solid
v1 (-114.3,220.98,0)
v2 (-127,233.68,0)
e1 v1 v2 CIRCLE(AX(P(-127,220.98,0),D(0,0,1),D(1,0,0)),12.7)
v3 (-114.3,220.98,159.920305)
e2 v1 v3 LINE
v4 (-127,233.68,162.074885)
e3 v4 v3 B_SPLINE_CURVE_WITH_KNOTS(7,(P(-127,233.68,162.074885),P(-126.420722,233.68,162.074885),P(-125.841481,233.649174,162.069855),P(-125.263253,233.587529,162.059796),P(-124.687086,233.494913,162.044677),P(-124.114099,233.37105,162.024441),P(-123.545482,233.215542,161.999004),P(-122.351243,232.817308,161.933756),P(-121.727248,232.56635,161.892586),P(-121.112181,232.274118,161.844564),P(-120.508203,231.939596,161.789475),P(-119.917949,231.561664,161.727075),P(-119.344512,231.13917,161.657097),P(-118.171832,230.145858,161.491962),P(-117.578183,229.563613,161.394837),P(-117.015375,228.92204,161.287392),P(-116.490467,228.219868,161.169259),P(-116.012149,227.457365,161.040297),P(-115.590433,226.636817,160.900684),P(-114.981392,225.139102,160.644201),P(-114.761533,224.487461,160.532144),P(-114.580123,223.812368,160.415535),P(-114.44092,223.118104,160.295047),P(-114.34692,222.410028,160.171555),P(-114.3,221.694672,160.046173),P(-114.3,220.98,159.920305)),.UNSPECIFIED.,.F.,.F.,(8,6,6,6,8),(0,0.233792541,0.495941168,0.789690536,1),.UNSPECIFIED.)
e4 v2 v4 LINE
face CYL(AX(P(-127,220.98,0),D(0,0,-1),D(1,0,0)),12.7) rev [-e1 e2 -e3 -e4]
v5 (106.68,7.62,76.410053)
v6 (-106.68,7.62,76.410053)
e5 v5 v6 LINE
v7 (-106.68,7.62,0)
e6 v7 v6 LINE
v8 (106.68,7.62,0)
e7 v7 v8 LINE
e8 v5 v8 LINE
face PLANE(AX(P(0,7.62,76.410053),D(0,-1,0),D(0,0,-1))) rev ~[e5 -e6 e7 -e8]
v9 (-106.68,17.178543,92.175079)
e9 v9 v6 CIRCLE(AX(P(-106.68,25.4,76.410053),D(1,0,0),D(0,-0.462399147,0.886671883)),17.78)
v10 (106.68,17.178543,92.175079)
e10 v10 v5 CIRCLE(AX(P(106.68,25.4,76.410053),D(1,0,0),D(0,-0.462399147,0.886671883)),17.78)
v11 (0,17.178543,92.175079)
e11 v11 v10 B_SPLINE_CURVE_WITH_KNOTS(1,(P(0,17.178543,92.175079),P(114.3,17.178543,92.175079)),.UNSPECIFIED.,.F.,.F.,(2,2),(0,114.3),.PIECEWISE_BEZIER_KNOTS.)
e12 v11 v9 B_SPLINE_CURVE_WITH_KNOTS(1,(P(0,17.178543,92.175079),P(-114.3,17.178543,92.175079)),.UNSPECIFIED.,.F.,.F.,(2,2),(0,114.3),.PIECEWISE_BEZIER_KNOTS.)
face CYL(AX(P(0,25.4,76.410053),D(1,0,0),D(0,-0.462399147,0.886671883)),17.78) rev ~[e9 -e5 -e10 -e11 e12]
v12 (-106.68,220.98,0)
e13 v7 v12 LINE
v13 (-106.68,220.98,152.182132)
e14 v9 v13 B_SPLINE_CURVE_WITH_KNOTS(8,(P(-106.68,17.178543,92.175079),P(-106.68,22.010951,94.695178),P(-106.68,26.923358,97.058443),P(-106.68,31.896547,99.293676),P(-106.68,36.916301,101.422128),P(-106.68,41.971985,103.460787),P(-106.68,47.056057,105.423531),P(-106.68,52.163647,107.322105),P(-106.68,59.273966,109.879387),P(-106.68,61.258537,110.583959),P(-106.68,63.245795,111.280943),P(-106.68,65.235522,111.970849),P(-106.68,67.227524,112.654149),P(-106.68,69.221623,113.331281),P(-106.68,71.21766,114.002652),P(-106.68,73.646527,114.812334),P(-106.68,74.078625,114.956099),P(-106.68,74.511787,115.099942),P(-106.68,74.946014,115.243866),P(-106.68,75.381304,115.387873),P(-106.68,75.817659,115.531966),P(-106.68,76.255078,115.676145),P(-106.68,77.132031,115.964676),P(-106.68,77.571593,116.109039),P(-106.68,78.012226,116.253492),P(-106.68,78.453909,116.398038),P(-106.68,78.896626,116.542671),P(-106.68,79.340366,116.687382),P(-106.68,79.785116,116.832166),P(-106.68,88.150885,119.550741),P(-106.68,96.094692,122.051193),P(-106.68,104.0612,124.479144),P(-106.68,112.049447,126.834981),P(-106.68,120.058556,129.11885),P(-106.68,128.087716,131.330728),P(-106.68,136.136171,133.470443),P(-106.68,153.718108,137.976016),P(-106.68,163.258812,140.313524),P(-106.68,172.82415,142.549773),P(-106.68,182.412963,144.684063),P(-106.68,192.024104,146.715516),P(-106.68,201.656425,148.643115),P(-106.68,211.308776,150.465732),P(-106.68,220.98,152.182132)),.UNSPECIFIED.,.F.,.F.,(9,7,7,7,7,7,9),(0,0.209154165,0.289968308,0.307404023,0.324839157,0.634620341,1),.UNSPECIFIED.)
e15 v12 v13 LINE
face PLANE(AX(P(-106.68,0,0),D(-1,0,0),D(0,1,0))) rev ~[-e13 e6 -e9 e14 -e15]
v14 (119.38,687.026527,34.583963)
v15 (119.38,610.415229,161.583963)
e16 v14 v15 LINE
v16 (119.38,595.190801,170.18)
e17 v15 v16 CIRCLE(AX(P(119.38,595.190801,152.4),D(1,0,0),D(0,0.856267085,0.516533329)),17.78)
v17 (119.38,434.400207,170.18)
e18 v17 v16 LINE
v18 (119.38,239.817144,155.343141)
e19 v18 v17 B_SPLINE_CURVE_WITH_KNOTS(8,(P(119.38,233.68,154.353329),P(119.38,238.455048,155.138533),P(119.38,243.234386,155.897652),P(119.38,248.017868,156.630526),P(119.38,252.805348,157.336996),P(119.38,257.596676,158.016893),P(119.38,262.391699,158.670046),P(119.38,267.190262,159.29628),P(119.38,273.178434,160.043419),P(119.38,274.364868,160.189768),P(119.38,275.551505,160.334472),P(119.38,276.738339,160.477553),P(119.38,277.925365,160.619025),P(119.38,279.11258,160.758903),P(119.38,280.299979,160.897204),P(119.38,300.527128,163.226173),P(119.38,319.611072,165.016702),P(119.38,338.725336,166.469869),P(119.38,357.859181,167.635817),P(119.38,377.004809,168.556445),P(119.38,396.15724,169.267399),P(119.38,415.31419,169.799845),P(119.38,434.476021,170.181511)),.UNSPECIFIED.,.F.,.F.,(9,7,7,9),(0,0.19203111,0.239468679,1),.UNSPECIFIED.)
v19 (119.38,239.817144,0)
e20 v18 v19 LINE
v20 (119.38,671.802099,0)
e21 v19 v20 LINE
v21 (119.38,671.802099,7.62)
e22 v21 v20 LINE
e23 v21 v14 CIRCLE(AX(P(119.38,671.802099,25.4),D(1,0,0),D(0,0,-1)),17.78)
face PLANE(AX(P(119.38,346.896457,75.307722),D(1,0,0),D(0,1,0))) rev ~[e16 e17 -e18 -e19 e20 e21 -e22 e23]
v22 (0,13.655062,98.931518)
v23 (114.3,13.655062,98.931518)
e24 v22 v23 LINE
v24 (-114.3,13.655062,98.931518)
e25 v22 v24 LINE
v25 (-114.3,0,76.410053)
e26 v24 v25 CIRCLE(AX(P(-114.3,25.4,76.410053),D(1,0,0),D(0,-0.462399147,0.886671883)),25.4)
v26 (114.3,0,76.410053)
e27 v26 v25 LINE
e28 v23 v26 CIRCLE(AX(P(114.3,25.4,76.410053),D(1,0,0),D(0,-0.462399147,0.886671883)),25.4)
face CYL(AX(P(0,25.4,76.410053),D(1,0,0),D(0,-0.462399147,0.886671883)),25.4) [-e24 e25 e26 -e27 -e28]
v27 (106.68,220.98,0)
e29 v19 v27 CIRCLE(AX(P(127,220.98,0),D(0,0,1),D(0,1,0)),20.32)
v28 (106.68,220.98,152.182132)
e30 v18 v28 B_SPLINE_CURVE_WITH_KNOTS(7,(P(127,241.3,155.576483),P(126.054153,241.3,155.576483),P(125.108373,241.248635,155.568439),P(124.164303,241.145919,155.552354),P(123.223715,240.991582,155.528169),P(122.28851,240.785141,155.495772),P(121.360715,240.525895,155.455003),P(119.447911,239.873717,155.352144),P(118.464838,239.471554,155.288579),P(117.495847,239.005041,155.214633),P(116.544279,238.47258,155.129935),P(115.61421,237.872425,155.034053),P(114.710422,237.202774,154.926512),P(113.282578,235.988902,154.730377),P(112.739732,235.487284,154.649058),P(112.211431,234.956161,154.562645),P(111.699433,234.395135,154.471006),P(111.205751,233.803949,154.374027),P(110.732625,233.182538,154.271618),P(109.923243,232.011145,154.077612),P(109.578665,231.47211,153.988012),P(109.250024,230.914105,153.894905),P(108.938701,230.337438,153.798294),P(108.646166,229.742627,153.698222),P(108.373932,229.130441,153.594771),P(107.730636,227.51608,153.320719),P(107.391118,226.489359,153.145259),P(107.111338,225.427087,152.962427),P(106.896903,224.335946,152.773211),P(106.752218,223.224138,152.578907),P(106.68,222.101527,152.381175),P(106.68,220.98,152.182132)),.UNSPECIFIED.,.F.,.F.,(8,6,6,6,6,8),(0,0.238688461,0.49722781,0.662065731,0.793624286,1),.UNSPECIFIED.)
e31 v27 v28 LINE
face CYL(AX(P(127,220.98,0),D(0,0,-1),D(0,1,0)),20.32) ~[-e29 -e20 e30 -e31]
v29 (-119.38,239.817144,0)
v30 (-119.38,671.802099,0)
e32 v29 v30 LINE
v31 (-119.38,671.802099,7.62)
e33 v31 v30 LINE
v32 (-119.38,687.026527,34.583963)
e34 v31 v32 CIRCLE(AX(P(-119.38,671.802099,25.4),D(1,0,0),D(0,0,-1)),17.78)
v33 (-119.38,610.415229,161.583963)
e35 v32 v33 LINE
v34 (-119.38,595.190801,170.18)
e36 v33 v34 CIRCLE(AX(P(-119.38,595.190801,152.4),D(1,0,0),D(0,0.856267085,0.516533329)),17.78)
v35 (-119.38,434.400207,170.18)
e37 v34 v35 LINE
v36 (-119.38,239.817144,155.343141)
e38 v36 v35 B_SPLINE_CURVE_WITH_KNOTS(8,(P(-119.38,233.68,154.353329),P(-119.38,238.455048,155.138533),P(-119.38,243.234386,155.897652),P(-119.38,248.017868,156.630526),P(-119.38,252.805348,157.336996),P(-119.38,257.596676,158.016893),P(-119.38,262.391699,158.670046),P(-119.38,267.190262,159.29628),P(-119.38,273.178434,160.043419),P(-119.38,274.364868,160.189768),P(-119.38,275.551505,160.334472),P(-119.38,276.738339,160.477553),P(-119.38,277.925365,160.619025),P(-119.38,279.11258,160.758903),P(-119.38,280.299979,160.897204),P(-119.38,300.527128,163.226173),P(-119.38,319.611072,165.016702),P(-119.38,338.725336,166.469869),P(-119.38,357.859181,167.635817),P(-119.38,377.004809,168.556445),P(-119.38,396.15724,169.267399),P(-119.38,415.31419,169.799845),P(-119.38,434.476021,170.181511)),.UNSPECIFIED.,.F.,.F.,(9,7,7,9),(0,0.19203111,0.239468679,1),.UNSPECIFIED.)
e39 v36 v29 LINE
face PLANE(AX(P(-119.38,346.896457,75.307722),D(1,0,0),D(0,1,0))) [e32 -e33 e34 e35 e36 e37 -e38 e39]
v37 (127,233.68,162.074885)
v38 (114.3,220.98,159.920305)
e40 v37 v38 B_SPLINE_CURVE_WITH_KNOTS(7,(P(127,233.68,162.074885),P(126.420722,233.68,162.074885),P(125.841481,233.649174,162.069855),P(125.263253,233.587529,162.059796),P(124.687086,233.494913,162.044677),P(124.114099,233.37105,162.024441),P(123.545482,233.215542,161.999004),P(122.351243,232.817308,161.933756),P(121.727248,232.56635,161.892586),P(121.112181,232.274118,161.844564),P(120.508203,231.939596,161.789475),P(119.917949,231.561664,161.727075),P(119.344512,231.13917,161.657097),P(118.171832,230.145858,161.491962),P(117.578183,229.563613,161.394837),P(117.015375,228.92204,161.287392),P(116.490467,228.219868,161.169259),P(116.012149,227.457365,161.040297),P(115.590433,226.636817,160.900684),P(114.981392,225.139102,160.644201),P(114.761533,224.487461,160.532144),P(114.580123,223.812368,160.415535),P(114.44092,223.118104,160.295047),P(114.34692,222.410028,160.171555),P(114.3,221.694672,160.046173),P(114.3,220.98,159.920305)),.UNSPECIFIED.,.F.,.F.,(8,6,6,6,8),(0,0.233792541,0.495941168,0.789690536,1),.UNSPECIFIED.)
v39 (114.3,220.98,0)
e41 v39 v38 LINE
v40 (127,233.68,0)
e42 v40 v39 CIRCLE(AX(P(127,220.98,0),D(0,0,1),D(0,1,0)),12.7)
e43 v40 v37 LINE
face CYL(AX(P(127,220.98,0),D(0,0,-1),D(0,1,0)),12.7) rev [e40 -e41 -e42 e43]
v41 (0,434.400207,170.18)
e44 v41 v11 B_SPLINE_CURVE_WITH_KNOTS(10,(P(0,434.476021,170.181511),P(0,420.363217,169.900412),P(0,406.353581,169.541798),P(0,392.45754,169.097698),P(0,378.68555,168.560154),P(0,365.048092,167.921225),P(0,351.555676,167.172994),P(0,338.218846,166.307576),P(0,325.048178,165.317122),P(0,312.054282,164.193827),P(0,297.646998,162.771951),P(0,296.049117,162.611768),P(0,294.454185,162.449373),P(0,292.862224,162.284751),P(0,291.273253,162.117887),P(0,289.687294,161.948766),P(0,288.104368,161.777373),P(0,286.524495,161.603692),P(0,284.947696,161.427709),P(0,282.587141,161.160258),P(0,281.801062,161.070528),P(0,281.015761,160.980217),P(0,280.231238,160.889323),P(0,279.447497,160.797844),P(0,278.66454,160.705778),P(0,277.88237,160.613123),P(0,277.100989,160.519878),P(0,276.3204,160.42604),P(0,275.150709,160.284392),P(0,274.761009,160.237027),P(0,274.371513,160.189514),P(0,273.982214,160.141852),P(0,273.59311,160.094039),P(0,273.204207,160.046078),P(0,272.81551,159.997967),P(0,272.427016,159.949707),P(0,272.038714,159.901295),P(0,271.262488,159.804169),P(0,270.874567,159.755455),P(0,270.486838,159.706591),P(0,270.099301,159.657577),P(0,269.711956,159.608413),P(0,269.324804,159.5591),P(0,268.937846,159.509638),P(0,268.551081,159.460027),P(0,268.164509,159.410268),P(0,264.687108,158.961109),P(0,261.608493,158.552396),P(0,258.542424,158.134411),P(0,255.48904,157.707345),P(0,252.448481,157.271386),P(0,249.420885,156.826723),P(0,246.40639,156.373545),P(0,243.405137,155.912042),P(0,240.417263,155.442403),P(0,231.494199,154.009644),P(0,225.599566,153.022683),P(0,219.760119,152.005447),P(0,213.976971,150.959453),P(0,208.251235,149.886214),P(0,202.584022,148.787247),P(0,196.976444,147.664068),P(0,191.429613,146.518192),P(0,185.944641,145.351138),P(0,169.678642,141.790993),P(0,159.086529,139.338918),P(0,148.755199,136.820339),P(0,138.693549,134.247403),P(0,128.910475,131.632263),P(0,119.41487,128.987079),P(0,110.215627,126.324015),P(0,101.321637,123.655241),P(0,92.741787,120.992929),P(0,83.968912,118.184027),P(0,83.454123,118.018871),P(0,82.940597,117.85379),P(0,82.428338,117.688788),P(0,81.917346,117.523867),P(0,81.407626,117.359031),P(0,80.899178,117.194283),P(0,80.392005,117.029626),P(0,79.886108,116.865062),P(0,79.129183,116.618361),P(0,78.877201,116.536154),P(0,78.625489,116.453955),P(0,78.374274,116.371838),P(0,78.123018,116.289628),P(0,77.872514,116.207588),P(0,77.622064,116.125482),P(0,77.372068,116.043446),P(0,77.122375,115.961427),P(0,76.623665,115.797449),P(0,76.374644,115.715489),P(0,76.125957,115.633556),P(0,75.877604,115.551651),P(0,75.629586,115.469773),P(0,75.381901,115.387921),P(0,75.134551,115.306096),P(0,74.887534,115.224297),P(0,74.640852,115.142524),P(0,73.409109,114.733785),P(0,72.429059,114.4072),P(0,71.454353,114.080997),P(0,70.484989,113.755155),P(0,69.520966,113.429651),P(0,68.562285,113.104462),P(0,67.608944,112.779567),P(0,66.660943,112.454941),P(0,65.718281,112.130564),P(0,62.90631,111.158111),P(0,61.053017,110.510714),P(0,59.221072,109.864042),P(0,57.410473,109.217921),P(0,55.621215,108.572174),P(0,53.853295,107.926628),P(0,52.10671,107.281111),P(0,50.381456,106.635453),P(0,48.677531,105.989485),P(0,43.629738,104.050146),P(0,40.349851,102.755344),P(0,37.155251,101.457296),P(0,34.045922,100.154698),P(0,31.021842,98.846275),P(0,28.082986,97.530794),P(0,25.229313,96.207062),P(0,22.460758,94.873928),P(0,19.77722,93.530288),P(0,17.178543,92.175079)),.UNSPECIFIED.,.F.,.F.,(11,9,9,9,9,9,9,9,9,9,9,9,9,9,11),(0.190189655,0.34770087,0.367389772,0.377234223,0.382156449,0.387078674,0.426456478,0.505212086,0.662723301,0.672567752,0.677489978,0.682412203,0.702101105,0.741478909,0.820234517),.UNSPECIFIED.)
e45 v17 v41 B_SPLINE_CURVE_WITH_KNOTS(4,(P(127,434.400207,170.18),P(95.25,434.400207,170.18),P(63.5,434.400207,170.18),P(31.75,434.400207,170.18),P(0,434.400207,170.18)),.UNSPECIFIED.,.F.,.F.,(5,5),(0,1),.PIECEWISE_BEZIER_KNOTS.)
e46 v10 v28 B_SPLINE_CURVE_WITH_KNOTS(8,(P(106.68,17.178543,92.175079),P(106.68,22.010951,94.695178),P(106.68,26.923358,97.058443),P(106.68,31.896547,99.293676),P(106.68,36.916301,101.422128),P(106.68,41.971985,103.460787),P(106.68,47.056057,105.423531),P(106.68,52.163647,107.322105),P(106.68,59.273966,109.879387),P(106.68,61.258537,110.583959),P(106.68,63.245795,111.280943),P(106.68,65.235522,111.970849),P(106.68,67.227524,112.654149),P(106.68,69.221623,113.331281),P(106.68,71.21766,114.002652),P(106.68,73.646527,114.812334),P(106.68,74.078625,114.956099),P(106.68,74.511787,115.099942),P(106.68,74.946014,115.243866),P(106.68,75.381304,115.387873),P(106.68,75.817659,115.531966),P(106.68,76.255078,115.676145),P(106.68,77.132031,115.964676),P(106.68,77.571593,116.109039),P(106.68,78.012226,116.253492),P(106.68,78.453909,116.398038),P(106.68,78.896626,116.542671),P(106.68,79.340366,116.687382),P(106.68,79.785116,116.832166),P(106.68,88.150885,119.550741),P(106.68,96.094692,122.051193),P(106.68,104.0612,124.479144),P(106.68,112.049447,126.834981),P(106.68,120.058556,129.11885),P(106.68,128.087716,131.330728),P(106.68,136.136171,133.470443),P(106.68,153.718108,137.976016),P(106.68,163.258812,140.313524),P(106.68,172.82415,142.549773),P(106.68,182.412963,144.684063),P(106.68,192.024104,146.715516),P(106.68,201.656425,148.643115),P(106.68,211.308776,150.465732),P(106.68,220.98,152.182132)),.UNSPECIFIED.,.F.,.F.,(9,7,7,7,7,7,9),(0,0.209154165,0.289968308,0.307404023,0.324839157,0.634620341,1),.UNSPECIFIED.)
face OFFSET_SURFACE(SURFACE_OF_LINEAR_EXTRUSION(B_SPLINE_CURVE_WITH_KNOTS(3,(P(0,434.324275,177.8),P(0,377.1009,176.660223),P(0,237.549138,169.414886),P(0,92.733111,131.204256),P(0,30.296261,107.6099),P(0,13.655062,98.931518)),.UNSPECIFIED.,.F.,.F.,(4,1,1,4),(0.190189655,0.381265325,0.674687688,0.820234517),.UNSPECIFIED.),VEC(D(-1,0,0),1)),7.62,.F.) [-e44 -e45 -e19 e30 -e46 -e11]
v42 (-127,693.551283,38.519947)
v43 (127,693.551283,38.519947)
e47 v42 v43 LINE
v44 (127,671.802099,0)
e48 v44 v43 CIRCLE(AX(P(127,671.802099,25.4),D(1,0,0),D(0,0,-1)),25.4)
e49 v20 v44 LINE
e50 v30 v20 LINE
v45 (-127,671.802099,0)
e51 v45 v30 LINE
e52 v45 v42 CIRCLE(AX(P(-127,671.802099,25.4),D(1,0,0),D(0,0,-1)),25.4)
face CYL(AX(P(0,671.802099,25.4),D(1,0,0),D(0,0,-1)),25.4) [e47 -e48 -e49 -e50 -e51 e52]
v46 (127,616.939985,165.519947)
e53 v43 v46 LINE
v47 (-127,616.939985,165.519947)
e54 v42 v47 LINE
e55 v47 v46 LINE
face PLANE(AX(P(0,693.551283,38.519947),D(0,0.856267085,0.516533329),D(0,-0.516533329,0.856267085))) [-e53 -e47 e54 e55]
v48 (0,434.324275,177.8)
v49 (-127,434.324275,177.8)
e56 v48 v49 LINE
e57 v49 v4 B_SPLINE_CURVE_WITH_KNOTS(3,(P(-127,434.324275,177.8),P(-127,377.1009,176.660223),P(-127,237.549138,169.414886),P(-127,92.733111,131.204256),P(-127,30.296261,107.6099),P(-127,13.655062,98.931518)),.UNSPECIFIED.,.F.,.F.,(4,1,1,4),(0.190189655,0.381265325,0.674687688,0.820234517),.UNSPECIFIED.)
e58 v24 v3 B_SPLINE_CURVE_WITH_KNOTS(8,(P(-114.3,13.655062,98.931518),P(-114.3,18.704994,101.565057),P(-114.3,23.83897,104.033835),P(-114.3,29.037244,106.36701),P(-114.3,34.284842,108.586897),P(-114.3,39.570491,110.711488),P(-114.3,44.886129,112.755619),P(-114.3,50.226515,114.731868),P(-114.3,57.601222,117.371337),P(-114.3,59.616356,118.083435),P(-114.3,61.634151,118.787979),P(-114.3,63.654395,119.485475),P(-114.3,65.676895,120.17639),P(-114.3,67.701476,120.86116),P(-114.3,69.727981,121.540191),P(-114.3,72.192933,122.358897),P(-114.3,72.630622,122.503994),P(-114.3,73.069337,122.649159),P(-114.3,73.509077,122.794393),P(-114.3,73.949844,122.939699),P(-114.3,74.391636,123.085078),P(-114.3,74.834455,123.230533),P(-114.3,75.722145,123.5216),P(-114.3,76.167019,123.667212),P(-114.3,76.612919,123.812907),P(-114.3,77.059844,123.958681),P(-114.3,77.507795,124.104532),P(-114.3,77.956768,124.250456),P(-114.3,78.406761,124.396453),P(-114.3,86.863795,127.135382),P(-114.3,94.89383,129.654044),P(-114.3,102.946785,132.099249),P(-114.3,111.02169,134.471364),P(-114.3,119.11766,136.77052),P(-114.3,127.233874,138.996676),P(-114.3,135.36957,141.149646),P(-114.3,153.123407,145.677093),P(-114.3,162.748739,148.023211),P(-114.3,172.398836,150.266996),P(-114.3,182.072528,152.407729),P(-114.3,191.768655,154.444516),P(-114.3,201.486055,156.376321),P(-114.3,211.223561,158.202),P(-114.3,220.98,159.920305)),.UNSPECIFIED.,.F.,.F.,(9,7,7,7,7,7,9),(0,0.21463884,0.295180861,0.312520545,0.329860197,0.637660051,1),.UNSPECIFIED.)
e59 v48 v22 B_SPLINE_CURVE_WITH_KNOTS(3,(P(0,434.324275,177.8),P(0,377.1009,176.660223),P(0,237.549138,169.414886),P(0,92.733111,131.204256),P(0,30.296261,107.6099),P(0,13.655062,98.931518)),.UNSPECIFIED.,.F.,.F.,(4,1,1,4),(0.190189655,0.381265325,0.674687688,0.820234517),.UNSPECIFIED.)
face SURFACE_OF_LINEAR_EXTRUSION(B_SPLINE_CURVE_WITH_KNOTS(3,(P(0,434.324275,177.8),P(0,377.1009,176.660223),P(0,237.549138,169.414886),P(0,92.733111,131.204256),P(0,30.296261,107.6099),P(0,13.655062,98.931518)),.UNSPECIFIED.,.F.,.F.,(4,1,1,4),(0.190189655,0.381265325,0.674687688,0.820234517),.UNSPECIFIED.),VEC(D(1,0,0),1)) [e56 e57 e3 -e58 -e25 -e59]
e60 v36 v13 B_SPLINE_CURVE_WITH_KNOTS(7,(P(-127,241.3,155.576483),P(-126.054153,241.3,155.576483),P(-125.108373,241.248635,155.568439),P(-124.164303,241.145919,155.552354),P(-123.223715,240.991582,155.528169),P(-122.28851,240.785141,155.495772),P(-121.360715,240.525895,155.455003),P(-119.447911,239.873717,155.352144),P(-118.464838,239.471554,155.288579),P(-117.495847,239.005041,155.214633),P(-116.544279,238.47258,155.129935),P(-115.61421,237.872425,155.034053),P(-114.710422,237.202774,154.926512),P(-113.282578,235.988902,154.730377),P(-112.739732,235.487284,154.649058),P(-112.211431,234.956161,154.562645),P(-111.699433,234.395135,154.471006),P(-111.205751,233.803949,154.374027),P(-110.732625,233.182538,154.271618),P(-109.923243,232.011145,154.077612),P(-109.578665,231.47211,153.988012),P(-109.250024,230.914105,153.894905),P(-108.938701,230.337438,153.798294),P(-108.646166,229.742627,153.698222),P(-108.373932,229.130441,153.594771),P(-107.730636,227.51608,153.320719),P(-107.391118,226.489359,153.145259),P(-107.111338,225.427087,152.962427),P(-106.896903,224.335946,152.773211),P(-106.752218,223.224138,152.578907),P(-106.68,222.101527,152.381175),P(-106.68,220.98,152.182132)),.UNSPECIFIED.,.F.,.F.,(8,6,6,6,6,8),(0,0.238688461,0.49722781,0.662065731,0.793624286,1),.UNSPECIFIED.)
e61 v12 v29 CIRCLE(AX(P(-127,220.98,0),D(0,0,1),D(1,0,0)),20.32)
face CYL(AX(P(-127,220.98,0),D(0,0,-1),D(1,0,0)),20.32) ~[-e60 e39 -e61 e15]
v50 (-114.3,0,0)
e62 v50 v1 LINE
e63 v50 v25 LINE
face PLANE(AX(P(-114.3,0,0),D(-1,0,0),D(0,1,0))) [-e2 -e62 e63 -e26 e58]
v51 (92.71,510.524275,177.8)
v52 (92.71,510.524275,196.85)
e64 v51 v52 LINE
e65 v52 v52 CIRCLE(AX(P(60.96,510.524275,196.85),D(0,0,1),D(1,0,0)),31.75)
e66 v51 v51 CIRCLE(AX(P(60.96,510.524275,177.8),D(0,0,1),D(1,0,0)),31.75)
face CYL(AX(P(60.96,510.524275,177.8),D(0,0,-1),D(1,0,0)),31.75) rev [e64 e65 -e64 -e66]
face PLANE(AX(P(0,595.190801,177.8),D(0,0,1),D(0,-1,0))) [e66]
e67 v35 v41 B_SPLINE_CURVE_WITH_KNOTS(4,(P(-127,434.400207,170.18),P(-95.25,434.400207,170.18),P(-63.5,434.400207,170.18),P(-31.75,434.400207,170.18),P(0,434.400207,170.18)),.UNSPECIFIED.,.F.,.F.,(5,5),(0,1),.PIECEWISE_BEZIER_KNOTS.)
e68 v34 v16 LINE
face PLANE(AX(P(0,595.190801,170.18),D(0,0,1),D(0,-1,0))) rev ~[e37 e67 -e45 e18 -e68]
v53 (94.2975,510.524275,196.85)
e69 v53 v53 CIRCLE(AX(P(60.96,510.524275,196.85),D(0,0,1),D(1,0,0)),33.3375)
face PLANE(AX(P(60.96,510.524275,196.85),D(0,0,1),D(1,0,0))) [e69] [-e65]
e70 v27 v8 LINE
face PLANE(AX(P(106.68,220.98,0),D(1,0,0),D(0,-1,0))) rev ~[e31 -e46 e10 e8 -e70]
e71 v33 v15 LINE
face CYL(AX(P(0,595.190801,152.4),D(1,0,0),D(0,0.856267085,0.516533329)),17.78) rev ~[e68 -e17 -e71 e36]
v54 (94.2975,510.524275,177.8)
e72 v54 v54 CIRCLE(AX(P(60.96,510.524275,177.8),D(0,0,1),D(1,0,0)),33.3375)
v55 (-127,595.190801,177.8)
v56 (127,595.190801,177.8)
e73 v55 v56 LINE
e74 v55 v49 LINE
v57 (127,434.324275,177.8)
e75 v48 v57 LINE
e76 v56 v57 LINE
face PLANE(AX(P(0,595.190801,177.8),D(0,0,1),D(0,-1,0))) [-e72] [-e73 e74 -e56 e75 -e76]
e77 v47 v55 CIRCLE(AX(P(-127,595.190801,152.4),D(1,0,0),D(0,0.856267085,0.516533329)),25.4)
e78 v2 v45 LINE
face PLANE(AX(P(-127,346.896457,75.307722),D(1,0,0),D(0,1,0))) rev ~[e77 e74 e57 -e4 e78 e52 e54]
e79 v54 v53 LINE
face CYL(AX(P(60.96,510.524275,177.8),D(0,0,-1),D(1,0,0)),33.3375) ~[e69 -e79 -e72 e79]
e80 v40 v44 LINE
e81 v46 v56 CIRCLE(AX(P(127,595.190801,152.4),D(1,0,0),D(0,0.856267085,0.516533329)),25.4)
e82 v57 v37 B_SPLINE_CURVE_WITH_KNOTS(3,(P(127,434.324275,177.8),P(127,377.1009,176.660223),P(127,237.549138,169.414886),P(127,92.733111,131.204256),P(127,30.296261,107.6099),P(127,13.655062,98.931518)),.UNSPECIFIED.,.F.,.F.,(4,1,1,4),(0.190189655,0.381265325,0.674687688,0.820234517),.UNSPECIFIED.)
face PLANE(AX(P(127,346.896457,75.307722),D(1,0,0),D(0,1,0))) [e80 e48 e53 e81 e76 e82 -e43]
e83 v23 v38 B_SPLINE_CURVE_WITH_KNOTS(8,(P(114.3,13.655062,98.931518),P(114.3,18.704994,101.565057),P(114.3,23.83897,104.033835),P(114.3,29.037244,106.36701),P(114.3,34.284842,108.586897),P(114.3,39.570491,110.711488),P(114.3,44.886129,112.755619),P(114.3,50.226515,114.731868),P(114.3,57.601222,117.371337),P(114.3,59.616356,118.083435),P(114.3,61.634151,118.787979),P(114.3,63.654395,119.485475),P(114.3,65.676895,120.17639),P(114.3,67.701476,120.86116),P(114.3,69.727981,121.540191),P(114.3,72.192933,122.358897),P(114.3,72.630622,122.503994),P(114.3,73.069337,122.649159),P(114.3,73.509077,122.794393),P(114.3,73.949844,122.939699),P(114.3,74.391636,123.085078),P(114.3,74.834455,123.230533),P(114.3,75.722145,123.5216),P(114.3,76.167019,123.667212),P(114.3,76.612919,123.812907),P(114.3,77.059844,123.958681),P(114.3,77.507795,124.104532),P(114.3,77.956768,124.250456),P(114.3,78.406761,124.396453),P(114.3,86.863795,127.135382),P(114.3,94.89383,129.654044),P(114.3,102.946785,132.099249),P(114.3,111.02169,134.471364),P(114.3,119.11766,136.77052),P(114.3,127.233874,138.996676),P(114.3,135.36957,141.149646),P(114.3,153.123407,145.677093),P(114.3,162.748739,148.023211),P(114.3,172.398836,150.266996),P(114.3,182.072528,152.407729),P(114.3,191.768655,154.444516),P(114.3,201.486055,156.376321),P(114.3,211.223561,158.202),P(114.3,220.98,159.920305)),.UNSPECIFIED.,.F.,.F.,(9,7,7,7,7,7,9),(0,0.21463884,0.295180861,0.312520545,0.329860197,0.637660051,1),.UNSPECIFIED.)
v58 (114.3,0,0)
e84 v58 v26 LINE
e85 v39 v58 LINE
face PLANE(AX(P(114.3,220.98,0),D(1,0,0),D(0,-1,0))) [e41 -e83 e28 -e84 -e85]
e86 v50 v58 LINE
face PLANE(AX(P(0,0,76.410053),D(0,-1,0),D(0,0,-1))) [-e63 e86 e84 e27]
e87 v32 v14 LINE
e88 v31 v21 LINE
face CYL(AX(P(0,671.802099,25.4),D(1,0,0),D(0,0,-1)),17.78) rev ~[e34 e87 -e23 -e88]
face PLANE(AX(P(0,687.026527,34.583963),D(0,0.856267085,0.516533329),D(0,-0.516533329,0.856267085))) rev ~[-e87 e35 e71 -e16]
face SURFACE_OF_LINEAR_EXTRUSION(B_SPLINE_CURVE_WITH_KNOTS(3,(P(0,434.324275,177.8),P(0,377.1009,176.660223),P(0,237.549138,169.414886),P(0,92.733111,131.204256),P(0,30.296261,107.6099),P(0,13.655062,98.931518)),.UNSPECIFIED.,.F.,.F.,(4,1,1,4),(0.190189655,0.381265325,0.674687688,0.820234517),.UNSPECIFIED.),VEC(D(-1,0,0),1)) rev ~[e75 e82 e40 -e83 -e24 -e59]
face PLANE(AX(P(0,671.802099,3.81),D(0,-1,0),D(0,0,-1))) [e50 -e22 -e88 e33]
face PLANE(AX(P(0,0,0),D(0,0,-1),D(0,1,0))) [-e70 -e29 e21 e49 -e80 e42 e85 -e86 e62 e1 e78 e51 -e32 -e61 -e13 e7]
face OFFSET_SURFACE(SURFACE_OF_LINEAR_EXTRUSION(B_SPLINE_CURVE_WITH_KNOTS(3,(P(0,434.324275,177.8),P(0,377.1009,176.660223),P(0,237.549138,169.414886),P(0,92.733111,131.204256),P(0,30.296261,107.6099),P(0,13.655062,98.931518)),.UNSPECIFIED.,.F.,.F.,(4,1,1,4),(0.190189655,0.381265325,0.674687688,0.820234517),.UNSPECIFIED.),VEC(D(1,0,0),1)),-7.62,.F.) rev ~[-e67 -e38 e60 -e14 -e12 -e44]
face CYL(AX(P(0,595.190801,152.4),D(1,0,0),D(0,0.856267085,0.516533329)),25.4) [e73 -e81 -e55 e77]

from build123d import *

# Parameters (mm, degrees)
F1_DEPTH = 127
F3_DEPTH = 177.8
F4_R     = 33.3375
F4_R_2   = 31.75
F5_DEPTH = 19.05
F6_T     = 7.62


# Not quite as in the source:
# - a shell that OpenCascade refuses in one call is made with other operations: the cavity is built on its own and cut out


with BuildPart() as f1:
    # F0 (on Right) → F1 (new body, symmetric)
    with BuildSketch(Plane.YZ):
        with BuildLine():
            Line((0, 76.4100525974), (0, 0))
            Line((0, 0), (671.8020987012, 0))
            ThreePointArc((671.8020987012, 0), (693.9200398628, 12.9117383606), (693.5512826501, 38.5199465532))
            Line((693.5512826501, 38.5199465532), (616.9399846733, 165.5199465532))
            ThreePointArc((616.9399846733, 165.5199465532), (607.6790623638, 174.5179411616), (595.1908007244, 177.8))
            Line((595.1908007244, 177.8), (434.3242754471, 177.8))
            add(Edge.make_bspline(
                [(434.3242754471, 177.8), (377.1008998353, 176.660223353), (237.5491375806, 169.4148859291), (92.7331109855, 131.2042560006), (30.2962614107, 107.6098996029), (13.6550616577, 98.9315184319)],
                knots=[0.1901896549, 0.1901896549, 0.1901896549, 0.1901896549, 0.3812653252, 0.674687688, 0.8202345165, 0.8202345165, 0.8202345165, 0.8202345165], degree=3))
            ThreePointArc((13.6550616577, 98.9315184319), (3.6804070723, 89.5789281398), (0, 76.4100525974))
        make_face()
    extrude(amount=F1_DEPTH, both=True)

    # F2 (on Top) → F3 (cut)
    with BuildSketch(Plane.XY):
        with BuildLine():
            Line((-127, 0), (-114.3, 0))
            Line((-114.3, 0), (-114.3, 220.98))
            ThreePointArc((-114.3, 220.98), (-118.0197438789, 229.9602561211), (-127, 233.68))
            Line((-127, 233.68), (-127, 0))
        make_face()
        with BuildLine():
            Line((114.3, 220.98), (114.3, 0))
            Line((114.3, 0), (127, 0))
            Line((127, 0), (127, 233.68))
            ThreePointArc((127, 233.68), (118.0197438789, 229.9602561211), (114.3, 220.98))
        make_face()
    extrude(amount=F3_DEPTH, mode=Mode.SUBTRACT)

    # F4 (on face) → F5 (join)
    with BuildSketch(Plane.XY.offset(177.8)):
        with Locations((60.96, 510.5242754471)):
            Circle(F4_R)
        with Locations((60.96, 510.5242754471)):
            Circle(F4_R_2, mode=Mode.SUBTRACT)
    extrude(amount=F5_DEPTH)

    # F6: shell of thickness 7.62, made by hand


with BuildPart() as f6_core1:
    # F6_t2: copy of F1
    add(f1.part)

    # the walls: a layer under each face that stays
    f6_faces = [f6_core1.faces().sort_by_distance(p)[0] for p in [
        (-63.5, 178.8934164203, 151.6082143397),
        (63.5, 178.8934164203, 151.6082143397),
        (0, 3.6804070723, 89.5789281398),
        (-114.3, 110.49, 79.9601525115),
        (-118.0197438789, 229.9602561211, 81.0374425071),
        (-127, 465.4410493506, 88.9),
        (0, 514.7575380857, 177.8),
        (114.3, 110.49, 79.9601525115),
        (118.0197438789, 229.9602561211, 81.0374425071),
        (127, 465.4410493506, 88.9),
        (0, 0, 38.2050262987),
        (0, 607.6790623638, 174.5179411616),
        (0, 655.2456336617, 102.0199465532),
        (0, 693.9200398628, 12.9117383606),
        (27.6225, 510.5242754471, 187.325),
        (29.845, 501.6342754471, 196.85),
        (29.21, 510.5242754471, 187.325),
        (60.96, 510.5242754471, 177.8),
    ]]
    thicken(f6_faces, amount=-F6_T, mode=Mode.SUBTRACT)

    # F6_s3 → F6_t4 (revolve, cut)
    with BuildSketch(Plane.XZ.offset(-510.5242754471)):
        Polygon((94.3737, 177.8762), (94.2975, 170.18), (86.6775, 170.18), (86.6775, 177.8), align=None)
    revolve(axis=Axis((60.96, 510.5242754471, 177.8), (0, 0, 1)), mode=Mode.SUBTRACT)

    # F6_s5 → F6_t6 (revolve, cut)
    with BuildSketch(Plane.XZ.offset(-510.5242754471)):
        Polygon((92.6338, 177.8762), (100.33, 177.8), (100.33, 170.18), (92.71, 170.18), align=None)
    revolve(axis=Axis((60.96, 510.5242754471, 177.8), (0, 0, 1)), mode=Mode.SUBTRACT)


with BuildPart() as f1_1:
    add(f1.part)

    # what is left inside the walls is the cavity
    f6_cavity = [f6_core1.part.solids().sort_by_distance(p)[0] for p in [
        (-39.793333, 339.711049, 0.0762),
    ]]
    add(f6_cavity, mode=Mode.SUBTRACT)


solid = f1_1.part
